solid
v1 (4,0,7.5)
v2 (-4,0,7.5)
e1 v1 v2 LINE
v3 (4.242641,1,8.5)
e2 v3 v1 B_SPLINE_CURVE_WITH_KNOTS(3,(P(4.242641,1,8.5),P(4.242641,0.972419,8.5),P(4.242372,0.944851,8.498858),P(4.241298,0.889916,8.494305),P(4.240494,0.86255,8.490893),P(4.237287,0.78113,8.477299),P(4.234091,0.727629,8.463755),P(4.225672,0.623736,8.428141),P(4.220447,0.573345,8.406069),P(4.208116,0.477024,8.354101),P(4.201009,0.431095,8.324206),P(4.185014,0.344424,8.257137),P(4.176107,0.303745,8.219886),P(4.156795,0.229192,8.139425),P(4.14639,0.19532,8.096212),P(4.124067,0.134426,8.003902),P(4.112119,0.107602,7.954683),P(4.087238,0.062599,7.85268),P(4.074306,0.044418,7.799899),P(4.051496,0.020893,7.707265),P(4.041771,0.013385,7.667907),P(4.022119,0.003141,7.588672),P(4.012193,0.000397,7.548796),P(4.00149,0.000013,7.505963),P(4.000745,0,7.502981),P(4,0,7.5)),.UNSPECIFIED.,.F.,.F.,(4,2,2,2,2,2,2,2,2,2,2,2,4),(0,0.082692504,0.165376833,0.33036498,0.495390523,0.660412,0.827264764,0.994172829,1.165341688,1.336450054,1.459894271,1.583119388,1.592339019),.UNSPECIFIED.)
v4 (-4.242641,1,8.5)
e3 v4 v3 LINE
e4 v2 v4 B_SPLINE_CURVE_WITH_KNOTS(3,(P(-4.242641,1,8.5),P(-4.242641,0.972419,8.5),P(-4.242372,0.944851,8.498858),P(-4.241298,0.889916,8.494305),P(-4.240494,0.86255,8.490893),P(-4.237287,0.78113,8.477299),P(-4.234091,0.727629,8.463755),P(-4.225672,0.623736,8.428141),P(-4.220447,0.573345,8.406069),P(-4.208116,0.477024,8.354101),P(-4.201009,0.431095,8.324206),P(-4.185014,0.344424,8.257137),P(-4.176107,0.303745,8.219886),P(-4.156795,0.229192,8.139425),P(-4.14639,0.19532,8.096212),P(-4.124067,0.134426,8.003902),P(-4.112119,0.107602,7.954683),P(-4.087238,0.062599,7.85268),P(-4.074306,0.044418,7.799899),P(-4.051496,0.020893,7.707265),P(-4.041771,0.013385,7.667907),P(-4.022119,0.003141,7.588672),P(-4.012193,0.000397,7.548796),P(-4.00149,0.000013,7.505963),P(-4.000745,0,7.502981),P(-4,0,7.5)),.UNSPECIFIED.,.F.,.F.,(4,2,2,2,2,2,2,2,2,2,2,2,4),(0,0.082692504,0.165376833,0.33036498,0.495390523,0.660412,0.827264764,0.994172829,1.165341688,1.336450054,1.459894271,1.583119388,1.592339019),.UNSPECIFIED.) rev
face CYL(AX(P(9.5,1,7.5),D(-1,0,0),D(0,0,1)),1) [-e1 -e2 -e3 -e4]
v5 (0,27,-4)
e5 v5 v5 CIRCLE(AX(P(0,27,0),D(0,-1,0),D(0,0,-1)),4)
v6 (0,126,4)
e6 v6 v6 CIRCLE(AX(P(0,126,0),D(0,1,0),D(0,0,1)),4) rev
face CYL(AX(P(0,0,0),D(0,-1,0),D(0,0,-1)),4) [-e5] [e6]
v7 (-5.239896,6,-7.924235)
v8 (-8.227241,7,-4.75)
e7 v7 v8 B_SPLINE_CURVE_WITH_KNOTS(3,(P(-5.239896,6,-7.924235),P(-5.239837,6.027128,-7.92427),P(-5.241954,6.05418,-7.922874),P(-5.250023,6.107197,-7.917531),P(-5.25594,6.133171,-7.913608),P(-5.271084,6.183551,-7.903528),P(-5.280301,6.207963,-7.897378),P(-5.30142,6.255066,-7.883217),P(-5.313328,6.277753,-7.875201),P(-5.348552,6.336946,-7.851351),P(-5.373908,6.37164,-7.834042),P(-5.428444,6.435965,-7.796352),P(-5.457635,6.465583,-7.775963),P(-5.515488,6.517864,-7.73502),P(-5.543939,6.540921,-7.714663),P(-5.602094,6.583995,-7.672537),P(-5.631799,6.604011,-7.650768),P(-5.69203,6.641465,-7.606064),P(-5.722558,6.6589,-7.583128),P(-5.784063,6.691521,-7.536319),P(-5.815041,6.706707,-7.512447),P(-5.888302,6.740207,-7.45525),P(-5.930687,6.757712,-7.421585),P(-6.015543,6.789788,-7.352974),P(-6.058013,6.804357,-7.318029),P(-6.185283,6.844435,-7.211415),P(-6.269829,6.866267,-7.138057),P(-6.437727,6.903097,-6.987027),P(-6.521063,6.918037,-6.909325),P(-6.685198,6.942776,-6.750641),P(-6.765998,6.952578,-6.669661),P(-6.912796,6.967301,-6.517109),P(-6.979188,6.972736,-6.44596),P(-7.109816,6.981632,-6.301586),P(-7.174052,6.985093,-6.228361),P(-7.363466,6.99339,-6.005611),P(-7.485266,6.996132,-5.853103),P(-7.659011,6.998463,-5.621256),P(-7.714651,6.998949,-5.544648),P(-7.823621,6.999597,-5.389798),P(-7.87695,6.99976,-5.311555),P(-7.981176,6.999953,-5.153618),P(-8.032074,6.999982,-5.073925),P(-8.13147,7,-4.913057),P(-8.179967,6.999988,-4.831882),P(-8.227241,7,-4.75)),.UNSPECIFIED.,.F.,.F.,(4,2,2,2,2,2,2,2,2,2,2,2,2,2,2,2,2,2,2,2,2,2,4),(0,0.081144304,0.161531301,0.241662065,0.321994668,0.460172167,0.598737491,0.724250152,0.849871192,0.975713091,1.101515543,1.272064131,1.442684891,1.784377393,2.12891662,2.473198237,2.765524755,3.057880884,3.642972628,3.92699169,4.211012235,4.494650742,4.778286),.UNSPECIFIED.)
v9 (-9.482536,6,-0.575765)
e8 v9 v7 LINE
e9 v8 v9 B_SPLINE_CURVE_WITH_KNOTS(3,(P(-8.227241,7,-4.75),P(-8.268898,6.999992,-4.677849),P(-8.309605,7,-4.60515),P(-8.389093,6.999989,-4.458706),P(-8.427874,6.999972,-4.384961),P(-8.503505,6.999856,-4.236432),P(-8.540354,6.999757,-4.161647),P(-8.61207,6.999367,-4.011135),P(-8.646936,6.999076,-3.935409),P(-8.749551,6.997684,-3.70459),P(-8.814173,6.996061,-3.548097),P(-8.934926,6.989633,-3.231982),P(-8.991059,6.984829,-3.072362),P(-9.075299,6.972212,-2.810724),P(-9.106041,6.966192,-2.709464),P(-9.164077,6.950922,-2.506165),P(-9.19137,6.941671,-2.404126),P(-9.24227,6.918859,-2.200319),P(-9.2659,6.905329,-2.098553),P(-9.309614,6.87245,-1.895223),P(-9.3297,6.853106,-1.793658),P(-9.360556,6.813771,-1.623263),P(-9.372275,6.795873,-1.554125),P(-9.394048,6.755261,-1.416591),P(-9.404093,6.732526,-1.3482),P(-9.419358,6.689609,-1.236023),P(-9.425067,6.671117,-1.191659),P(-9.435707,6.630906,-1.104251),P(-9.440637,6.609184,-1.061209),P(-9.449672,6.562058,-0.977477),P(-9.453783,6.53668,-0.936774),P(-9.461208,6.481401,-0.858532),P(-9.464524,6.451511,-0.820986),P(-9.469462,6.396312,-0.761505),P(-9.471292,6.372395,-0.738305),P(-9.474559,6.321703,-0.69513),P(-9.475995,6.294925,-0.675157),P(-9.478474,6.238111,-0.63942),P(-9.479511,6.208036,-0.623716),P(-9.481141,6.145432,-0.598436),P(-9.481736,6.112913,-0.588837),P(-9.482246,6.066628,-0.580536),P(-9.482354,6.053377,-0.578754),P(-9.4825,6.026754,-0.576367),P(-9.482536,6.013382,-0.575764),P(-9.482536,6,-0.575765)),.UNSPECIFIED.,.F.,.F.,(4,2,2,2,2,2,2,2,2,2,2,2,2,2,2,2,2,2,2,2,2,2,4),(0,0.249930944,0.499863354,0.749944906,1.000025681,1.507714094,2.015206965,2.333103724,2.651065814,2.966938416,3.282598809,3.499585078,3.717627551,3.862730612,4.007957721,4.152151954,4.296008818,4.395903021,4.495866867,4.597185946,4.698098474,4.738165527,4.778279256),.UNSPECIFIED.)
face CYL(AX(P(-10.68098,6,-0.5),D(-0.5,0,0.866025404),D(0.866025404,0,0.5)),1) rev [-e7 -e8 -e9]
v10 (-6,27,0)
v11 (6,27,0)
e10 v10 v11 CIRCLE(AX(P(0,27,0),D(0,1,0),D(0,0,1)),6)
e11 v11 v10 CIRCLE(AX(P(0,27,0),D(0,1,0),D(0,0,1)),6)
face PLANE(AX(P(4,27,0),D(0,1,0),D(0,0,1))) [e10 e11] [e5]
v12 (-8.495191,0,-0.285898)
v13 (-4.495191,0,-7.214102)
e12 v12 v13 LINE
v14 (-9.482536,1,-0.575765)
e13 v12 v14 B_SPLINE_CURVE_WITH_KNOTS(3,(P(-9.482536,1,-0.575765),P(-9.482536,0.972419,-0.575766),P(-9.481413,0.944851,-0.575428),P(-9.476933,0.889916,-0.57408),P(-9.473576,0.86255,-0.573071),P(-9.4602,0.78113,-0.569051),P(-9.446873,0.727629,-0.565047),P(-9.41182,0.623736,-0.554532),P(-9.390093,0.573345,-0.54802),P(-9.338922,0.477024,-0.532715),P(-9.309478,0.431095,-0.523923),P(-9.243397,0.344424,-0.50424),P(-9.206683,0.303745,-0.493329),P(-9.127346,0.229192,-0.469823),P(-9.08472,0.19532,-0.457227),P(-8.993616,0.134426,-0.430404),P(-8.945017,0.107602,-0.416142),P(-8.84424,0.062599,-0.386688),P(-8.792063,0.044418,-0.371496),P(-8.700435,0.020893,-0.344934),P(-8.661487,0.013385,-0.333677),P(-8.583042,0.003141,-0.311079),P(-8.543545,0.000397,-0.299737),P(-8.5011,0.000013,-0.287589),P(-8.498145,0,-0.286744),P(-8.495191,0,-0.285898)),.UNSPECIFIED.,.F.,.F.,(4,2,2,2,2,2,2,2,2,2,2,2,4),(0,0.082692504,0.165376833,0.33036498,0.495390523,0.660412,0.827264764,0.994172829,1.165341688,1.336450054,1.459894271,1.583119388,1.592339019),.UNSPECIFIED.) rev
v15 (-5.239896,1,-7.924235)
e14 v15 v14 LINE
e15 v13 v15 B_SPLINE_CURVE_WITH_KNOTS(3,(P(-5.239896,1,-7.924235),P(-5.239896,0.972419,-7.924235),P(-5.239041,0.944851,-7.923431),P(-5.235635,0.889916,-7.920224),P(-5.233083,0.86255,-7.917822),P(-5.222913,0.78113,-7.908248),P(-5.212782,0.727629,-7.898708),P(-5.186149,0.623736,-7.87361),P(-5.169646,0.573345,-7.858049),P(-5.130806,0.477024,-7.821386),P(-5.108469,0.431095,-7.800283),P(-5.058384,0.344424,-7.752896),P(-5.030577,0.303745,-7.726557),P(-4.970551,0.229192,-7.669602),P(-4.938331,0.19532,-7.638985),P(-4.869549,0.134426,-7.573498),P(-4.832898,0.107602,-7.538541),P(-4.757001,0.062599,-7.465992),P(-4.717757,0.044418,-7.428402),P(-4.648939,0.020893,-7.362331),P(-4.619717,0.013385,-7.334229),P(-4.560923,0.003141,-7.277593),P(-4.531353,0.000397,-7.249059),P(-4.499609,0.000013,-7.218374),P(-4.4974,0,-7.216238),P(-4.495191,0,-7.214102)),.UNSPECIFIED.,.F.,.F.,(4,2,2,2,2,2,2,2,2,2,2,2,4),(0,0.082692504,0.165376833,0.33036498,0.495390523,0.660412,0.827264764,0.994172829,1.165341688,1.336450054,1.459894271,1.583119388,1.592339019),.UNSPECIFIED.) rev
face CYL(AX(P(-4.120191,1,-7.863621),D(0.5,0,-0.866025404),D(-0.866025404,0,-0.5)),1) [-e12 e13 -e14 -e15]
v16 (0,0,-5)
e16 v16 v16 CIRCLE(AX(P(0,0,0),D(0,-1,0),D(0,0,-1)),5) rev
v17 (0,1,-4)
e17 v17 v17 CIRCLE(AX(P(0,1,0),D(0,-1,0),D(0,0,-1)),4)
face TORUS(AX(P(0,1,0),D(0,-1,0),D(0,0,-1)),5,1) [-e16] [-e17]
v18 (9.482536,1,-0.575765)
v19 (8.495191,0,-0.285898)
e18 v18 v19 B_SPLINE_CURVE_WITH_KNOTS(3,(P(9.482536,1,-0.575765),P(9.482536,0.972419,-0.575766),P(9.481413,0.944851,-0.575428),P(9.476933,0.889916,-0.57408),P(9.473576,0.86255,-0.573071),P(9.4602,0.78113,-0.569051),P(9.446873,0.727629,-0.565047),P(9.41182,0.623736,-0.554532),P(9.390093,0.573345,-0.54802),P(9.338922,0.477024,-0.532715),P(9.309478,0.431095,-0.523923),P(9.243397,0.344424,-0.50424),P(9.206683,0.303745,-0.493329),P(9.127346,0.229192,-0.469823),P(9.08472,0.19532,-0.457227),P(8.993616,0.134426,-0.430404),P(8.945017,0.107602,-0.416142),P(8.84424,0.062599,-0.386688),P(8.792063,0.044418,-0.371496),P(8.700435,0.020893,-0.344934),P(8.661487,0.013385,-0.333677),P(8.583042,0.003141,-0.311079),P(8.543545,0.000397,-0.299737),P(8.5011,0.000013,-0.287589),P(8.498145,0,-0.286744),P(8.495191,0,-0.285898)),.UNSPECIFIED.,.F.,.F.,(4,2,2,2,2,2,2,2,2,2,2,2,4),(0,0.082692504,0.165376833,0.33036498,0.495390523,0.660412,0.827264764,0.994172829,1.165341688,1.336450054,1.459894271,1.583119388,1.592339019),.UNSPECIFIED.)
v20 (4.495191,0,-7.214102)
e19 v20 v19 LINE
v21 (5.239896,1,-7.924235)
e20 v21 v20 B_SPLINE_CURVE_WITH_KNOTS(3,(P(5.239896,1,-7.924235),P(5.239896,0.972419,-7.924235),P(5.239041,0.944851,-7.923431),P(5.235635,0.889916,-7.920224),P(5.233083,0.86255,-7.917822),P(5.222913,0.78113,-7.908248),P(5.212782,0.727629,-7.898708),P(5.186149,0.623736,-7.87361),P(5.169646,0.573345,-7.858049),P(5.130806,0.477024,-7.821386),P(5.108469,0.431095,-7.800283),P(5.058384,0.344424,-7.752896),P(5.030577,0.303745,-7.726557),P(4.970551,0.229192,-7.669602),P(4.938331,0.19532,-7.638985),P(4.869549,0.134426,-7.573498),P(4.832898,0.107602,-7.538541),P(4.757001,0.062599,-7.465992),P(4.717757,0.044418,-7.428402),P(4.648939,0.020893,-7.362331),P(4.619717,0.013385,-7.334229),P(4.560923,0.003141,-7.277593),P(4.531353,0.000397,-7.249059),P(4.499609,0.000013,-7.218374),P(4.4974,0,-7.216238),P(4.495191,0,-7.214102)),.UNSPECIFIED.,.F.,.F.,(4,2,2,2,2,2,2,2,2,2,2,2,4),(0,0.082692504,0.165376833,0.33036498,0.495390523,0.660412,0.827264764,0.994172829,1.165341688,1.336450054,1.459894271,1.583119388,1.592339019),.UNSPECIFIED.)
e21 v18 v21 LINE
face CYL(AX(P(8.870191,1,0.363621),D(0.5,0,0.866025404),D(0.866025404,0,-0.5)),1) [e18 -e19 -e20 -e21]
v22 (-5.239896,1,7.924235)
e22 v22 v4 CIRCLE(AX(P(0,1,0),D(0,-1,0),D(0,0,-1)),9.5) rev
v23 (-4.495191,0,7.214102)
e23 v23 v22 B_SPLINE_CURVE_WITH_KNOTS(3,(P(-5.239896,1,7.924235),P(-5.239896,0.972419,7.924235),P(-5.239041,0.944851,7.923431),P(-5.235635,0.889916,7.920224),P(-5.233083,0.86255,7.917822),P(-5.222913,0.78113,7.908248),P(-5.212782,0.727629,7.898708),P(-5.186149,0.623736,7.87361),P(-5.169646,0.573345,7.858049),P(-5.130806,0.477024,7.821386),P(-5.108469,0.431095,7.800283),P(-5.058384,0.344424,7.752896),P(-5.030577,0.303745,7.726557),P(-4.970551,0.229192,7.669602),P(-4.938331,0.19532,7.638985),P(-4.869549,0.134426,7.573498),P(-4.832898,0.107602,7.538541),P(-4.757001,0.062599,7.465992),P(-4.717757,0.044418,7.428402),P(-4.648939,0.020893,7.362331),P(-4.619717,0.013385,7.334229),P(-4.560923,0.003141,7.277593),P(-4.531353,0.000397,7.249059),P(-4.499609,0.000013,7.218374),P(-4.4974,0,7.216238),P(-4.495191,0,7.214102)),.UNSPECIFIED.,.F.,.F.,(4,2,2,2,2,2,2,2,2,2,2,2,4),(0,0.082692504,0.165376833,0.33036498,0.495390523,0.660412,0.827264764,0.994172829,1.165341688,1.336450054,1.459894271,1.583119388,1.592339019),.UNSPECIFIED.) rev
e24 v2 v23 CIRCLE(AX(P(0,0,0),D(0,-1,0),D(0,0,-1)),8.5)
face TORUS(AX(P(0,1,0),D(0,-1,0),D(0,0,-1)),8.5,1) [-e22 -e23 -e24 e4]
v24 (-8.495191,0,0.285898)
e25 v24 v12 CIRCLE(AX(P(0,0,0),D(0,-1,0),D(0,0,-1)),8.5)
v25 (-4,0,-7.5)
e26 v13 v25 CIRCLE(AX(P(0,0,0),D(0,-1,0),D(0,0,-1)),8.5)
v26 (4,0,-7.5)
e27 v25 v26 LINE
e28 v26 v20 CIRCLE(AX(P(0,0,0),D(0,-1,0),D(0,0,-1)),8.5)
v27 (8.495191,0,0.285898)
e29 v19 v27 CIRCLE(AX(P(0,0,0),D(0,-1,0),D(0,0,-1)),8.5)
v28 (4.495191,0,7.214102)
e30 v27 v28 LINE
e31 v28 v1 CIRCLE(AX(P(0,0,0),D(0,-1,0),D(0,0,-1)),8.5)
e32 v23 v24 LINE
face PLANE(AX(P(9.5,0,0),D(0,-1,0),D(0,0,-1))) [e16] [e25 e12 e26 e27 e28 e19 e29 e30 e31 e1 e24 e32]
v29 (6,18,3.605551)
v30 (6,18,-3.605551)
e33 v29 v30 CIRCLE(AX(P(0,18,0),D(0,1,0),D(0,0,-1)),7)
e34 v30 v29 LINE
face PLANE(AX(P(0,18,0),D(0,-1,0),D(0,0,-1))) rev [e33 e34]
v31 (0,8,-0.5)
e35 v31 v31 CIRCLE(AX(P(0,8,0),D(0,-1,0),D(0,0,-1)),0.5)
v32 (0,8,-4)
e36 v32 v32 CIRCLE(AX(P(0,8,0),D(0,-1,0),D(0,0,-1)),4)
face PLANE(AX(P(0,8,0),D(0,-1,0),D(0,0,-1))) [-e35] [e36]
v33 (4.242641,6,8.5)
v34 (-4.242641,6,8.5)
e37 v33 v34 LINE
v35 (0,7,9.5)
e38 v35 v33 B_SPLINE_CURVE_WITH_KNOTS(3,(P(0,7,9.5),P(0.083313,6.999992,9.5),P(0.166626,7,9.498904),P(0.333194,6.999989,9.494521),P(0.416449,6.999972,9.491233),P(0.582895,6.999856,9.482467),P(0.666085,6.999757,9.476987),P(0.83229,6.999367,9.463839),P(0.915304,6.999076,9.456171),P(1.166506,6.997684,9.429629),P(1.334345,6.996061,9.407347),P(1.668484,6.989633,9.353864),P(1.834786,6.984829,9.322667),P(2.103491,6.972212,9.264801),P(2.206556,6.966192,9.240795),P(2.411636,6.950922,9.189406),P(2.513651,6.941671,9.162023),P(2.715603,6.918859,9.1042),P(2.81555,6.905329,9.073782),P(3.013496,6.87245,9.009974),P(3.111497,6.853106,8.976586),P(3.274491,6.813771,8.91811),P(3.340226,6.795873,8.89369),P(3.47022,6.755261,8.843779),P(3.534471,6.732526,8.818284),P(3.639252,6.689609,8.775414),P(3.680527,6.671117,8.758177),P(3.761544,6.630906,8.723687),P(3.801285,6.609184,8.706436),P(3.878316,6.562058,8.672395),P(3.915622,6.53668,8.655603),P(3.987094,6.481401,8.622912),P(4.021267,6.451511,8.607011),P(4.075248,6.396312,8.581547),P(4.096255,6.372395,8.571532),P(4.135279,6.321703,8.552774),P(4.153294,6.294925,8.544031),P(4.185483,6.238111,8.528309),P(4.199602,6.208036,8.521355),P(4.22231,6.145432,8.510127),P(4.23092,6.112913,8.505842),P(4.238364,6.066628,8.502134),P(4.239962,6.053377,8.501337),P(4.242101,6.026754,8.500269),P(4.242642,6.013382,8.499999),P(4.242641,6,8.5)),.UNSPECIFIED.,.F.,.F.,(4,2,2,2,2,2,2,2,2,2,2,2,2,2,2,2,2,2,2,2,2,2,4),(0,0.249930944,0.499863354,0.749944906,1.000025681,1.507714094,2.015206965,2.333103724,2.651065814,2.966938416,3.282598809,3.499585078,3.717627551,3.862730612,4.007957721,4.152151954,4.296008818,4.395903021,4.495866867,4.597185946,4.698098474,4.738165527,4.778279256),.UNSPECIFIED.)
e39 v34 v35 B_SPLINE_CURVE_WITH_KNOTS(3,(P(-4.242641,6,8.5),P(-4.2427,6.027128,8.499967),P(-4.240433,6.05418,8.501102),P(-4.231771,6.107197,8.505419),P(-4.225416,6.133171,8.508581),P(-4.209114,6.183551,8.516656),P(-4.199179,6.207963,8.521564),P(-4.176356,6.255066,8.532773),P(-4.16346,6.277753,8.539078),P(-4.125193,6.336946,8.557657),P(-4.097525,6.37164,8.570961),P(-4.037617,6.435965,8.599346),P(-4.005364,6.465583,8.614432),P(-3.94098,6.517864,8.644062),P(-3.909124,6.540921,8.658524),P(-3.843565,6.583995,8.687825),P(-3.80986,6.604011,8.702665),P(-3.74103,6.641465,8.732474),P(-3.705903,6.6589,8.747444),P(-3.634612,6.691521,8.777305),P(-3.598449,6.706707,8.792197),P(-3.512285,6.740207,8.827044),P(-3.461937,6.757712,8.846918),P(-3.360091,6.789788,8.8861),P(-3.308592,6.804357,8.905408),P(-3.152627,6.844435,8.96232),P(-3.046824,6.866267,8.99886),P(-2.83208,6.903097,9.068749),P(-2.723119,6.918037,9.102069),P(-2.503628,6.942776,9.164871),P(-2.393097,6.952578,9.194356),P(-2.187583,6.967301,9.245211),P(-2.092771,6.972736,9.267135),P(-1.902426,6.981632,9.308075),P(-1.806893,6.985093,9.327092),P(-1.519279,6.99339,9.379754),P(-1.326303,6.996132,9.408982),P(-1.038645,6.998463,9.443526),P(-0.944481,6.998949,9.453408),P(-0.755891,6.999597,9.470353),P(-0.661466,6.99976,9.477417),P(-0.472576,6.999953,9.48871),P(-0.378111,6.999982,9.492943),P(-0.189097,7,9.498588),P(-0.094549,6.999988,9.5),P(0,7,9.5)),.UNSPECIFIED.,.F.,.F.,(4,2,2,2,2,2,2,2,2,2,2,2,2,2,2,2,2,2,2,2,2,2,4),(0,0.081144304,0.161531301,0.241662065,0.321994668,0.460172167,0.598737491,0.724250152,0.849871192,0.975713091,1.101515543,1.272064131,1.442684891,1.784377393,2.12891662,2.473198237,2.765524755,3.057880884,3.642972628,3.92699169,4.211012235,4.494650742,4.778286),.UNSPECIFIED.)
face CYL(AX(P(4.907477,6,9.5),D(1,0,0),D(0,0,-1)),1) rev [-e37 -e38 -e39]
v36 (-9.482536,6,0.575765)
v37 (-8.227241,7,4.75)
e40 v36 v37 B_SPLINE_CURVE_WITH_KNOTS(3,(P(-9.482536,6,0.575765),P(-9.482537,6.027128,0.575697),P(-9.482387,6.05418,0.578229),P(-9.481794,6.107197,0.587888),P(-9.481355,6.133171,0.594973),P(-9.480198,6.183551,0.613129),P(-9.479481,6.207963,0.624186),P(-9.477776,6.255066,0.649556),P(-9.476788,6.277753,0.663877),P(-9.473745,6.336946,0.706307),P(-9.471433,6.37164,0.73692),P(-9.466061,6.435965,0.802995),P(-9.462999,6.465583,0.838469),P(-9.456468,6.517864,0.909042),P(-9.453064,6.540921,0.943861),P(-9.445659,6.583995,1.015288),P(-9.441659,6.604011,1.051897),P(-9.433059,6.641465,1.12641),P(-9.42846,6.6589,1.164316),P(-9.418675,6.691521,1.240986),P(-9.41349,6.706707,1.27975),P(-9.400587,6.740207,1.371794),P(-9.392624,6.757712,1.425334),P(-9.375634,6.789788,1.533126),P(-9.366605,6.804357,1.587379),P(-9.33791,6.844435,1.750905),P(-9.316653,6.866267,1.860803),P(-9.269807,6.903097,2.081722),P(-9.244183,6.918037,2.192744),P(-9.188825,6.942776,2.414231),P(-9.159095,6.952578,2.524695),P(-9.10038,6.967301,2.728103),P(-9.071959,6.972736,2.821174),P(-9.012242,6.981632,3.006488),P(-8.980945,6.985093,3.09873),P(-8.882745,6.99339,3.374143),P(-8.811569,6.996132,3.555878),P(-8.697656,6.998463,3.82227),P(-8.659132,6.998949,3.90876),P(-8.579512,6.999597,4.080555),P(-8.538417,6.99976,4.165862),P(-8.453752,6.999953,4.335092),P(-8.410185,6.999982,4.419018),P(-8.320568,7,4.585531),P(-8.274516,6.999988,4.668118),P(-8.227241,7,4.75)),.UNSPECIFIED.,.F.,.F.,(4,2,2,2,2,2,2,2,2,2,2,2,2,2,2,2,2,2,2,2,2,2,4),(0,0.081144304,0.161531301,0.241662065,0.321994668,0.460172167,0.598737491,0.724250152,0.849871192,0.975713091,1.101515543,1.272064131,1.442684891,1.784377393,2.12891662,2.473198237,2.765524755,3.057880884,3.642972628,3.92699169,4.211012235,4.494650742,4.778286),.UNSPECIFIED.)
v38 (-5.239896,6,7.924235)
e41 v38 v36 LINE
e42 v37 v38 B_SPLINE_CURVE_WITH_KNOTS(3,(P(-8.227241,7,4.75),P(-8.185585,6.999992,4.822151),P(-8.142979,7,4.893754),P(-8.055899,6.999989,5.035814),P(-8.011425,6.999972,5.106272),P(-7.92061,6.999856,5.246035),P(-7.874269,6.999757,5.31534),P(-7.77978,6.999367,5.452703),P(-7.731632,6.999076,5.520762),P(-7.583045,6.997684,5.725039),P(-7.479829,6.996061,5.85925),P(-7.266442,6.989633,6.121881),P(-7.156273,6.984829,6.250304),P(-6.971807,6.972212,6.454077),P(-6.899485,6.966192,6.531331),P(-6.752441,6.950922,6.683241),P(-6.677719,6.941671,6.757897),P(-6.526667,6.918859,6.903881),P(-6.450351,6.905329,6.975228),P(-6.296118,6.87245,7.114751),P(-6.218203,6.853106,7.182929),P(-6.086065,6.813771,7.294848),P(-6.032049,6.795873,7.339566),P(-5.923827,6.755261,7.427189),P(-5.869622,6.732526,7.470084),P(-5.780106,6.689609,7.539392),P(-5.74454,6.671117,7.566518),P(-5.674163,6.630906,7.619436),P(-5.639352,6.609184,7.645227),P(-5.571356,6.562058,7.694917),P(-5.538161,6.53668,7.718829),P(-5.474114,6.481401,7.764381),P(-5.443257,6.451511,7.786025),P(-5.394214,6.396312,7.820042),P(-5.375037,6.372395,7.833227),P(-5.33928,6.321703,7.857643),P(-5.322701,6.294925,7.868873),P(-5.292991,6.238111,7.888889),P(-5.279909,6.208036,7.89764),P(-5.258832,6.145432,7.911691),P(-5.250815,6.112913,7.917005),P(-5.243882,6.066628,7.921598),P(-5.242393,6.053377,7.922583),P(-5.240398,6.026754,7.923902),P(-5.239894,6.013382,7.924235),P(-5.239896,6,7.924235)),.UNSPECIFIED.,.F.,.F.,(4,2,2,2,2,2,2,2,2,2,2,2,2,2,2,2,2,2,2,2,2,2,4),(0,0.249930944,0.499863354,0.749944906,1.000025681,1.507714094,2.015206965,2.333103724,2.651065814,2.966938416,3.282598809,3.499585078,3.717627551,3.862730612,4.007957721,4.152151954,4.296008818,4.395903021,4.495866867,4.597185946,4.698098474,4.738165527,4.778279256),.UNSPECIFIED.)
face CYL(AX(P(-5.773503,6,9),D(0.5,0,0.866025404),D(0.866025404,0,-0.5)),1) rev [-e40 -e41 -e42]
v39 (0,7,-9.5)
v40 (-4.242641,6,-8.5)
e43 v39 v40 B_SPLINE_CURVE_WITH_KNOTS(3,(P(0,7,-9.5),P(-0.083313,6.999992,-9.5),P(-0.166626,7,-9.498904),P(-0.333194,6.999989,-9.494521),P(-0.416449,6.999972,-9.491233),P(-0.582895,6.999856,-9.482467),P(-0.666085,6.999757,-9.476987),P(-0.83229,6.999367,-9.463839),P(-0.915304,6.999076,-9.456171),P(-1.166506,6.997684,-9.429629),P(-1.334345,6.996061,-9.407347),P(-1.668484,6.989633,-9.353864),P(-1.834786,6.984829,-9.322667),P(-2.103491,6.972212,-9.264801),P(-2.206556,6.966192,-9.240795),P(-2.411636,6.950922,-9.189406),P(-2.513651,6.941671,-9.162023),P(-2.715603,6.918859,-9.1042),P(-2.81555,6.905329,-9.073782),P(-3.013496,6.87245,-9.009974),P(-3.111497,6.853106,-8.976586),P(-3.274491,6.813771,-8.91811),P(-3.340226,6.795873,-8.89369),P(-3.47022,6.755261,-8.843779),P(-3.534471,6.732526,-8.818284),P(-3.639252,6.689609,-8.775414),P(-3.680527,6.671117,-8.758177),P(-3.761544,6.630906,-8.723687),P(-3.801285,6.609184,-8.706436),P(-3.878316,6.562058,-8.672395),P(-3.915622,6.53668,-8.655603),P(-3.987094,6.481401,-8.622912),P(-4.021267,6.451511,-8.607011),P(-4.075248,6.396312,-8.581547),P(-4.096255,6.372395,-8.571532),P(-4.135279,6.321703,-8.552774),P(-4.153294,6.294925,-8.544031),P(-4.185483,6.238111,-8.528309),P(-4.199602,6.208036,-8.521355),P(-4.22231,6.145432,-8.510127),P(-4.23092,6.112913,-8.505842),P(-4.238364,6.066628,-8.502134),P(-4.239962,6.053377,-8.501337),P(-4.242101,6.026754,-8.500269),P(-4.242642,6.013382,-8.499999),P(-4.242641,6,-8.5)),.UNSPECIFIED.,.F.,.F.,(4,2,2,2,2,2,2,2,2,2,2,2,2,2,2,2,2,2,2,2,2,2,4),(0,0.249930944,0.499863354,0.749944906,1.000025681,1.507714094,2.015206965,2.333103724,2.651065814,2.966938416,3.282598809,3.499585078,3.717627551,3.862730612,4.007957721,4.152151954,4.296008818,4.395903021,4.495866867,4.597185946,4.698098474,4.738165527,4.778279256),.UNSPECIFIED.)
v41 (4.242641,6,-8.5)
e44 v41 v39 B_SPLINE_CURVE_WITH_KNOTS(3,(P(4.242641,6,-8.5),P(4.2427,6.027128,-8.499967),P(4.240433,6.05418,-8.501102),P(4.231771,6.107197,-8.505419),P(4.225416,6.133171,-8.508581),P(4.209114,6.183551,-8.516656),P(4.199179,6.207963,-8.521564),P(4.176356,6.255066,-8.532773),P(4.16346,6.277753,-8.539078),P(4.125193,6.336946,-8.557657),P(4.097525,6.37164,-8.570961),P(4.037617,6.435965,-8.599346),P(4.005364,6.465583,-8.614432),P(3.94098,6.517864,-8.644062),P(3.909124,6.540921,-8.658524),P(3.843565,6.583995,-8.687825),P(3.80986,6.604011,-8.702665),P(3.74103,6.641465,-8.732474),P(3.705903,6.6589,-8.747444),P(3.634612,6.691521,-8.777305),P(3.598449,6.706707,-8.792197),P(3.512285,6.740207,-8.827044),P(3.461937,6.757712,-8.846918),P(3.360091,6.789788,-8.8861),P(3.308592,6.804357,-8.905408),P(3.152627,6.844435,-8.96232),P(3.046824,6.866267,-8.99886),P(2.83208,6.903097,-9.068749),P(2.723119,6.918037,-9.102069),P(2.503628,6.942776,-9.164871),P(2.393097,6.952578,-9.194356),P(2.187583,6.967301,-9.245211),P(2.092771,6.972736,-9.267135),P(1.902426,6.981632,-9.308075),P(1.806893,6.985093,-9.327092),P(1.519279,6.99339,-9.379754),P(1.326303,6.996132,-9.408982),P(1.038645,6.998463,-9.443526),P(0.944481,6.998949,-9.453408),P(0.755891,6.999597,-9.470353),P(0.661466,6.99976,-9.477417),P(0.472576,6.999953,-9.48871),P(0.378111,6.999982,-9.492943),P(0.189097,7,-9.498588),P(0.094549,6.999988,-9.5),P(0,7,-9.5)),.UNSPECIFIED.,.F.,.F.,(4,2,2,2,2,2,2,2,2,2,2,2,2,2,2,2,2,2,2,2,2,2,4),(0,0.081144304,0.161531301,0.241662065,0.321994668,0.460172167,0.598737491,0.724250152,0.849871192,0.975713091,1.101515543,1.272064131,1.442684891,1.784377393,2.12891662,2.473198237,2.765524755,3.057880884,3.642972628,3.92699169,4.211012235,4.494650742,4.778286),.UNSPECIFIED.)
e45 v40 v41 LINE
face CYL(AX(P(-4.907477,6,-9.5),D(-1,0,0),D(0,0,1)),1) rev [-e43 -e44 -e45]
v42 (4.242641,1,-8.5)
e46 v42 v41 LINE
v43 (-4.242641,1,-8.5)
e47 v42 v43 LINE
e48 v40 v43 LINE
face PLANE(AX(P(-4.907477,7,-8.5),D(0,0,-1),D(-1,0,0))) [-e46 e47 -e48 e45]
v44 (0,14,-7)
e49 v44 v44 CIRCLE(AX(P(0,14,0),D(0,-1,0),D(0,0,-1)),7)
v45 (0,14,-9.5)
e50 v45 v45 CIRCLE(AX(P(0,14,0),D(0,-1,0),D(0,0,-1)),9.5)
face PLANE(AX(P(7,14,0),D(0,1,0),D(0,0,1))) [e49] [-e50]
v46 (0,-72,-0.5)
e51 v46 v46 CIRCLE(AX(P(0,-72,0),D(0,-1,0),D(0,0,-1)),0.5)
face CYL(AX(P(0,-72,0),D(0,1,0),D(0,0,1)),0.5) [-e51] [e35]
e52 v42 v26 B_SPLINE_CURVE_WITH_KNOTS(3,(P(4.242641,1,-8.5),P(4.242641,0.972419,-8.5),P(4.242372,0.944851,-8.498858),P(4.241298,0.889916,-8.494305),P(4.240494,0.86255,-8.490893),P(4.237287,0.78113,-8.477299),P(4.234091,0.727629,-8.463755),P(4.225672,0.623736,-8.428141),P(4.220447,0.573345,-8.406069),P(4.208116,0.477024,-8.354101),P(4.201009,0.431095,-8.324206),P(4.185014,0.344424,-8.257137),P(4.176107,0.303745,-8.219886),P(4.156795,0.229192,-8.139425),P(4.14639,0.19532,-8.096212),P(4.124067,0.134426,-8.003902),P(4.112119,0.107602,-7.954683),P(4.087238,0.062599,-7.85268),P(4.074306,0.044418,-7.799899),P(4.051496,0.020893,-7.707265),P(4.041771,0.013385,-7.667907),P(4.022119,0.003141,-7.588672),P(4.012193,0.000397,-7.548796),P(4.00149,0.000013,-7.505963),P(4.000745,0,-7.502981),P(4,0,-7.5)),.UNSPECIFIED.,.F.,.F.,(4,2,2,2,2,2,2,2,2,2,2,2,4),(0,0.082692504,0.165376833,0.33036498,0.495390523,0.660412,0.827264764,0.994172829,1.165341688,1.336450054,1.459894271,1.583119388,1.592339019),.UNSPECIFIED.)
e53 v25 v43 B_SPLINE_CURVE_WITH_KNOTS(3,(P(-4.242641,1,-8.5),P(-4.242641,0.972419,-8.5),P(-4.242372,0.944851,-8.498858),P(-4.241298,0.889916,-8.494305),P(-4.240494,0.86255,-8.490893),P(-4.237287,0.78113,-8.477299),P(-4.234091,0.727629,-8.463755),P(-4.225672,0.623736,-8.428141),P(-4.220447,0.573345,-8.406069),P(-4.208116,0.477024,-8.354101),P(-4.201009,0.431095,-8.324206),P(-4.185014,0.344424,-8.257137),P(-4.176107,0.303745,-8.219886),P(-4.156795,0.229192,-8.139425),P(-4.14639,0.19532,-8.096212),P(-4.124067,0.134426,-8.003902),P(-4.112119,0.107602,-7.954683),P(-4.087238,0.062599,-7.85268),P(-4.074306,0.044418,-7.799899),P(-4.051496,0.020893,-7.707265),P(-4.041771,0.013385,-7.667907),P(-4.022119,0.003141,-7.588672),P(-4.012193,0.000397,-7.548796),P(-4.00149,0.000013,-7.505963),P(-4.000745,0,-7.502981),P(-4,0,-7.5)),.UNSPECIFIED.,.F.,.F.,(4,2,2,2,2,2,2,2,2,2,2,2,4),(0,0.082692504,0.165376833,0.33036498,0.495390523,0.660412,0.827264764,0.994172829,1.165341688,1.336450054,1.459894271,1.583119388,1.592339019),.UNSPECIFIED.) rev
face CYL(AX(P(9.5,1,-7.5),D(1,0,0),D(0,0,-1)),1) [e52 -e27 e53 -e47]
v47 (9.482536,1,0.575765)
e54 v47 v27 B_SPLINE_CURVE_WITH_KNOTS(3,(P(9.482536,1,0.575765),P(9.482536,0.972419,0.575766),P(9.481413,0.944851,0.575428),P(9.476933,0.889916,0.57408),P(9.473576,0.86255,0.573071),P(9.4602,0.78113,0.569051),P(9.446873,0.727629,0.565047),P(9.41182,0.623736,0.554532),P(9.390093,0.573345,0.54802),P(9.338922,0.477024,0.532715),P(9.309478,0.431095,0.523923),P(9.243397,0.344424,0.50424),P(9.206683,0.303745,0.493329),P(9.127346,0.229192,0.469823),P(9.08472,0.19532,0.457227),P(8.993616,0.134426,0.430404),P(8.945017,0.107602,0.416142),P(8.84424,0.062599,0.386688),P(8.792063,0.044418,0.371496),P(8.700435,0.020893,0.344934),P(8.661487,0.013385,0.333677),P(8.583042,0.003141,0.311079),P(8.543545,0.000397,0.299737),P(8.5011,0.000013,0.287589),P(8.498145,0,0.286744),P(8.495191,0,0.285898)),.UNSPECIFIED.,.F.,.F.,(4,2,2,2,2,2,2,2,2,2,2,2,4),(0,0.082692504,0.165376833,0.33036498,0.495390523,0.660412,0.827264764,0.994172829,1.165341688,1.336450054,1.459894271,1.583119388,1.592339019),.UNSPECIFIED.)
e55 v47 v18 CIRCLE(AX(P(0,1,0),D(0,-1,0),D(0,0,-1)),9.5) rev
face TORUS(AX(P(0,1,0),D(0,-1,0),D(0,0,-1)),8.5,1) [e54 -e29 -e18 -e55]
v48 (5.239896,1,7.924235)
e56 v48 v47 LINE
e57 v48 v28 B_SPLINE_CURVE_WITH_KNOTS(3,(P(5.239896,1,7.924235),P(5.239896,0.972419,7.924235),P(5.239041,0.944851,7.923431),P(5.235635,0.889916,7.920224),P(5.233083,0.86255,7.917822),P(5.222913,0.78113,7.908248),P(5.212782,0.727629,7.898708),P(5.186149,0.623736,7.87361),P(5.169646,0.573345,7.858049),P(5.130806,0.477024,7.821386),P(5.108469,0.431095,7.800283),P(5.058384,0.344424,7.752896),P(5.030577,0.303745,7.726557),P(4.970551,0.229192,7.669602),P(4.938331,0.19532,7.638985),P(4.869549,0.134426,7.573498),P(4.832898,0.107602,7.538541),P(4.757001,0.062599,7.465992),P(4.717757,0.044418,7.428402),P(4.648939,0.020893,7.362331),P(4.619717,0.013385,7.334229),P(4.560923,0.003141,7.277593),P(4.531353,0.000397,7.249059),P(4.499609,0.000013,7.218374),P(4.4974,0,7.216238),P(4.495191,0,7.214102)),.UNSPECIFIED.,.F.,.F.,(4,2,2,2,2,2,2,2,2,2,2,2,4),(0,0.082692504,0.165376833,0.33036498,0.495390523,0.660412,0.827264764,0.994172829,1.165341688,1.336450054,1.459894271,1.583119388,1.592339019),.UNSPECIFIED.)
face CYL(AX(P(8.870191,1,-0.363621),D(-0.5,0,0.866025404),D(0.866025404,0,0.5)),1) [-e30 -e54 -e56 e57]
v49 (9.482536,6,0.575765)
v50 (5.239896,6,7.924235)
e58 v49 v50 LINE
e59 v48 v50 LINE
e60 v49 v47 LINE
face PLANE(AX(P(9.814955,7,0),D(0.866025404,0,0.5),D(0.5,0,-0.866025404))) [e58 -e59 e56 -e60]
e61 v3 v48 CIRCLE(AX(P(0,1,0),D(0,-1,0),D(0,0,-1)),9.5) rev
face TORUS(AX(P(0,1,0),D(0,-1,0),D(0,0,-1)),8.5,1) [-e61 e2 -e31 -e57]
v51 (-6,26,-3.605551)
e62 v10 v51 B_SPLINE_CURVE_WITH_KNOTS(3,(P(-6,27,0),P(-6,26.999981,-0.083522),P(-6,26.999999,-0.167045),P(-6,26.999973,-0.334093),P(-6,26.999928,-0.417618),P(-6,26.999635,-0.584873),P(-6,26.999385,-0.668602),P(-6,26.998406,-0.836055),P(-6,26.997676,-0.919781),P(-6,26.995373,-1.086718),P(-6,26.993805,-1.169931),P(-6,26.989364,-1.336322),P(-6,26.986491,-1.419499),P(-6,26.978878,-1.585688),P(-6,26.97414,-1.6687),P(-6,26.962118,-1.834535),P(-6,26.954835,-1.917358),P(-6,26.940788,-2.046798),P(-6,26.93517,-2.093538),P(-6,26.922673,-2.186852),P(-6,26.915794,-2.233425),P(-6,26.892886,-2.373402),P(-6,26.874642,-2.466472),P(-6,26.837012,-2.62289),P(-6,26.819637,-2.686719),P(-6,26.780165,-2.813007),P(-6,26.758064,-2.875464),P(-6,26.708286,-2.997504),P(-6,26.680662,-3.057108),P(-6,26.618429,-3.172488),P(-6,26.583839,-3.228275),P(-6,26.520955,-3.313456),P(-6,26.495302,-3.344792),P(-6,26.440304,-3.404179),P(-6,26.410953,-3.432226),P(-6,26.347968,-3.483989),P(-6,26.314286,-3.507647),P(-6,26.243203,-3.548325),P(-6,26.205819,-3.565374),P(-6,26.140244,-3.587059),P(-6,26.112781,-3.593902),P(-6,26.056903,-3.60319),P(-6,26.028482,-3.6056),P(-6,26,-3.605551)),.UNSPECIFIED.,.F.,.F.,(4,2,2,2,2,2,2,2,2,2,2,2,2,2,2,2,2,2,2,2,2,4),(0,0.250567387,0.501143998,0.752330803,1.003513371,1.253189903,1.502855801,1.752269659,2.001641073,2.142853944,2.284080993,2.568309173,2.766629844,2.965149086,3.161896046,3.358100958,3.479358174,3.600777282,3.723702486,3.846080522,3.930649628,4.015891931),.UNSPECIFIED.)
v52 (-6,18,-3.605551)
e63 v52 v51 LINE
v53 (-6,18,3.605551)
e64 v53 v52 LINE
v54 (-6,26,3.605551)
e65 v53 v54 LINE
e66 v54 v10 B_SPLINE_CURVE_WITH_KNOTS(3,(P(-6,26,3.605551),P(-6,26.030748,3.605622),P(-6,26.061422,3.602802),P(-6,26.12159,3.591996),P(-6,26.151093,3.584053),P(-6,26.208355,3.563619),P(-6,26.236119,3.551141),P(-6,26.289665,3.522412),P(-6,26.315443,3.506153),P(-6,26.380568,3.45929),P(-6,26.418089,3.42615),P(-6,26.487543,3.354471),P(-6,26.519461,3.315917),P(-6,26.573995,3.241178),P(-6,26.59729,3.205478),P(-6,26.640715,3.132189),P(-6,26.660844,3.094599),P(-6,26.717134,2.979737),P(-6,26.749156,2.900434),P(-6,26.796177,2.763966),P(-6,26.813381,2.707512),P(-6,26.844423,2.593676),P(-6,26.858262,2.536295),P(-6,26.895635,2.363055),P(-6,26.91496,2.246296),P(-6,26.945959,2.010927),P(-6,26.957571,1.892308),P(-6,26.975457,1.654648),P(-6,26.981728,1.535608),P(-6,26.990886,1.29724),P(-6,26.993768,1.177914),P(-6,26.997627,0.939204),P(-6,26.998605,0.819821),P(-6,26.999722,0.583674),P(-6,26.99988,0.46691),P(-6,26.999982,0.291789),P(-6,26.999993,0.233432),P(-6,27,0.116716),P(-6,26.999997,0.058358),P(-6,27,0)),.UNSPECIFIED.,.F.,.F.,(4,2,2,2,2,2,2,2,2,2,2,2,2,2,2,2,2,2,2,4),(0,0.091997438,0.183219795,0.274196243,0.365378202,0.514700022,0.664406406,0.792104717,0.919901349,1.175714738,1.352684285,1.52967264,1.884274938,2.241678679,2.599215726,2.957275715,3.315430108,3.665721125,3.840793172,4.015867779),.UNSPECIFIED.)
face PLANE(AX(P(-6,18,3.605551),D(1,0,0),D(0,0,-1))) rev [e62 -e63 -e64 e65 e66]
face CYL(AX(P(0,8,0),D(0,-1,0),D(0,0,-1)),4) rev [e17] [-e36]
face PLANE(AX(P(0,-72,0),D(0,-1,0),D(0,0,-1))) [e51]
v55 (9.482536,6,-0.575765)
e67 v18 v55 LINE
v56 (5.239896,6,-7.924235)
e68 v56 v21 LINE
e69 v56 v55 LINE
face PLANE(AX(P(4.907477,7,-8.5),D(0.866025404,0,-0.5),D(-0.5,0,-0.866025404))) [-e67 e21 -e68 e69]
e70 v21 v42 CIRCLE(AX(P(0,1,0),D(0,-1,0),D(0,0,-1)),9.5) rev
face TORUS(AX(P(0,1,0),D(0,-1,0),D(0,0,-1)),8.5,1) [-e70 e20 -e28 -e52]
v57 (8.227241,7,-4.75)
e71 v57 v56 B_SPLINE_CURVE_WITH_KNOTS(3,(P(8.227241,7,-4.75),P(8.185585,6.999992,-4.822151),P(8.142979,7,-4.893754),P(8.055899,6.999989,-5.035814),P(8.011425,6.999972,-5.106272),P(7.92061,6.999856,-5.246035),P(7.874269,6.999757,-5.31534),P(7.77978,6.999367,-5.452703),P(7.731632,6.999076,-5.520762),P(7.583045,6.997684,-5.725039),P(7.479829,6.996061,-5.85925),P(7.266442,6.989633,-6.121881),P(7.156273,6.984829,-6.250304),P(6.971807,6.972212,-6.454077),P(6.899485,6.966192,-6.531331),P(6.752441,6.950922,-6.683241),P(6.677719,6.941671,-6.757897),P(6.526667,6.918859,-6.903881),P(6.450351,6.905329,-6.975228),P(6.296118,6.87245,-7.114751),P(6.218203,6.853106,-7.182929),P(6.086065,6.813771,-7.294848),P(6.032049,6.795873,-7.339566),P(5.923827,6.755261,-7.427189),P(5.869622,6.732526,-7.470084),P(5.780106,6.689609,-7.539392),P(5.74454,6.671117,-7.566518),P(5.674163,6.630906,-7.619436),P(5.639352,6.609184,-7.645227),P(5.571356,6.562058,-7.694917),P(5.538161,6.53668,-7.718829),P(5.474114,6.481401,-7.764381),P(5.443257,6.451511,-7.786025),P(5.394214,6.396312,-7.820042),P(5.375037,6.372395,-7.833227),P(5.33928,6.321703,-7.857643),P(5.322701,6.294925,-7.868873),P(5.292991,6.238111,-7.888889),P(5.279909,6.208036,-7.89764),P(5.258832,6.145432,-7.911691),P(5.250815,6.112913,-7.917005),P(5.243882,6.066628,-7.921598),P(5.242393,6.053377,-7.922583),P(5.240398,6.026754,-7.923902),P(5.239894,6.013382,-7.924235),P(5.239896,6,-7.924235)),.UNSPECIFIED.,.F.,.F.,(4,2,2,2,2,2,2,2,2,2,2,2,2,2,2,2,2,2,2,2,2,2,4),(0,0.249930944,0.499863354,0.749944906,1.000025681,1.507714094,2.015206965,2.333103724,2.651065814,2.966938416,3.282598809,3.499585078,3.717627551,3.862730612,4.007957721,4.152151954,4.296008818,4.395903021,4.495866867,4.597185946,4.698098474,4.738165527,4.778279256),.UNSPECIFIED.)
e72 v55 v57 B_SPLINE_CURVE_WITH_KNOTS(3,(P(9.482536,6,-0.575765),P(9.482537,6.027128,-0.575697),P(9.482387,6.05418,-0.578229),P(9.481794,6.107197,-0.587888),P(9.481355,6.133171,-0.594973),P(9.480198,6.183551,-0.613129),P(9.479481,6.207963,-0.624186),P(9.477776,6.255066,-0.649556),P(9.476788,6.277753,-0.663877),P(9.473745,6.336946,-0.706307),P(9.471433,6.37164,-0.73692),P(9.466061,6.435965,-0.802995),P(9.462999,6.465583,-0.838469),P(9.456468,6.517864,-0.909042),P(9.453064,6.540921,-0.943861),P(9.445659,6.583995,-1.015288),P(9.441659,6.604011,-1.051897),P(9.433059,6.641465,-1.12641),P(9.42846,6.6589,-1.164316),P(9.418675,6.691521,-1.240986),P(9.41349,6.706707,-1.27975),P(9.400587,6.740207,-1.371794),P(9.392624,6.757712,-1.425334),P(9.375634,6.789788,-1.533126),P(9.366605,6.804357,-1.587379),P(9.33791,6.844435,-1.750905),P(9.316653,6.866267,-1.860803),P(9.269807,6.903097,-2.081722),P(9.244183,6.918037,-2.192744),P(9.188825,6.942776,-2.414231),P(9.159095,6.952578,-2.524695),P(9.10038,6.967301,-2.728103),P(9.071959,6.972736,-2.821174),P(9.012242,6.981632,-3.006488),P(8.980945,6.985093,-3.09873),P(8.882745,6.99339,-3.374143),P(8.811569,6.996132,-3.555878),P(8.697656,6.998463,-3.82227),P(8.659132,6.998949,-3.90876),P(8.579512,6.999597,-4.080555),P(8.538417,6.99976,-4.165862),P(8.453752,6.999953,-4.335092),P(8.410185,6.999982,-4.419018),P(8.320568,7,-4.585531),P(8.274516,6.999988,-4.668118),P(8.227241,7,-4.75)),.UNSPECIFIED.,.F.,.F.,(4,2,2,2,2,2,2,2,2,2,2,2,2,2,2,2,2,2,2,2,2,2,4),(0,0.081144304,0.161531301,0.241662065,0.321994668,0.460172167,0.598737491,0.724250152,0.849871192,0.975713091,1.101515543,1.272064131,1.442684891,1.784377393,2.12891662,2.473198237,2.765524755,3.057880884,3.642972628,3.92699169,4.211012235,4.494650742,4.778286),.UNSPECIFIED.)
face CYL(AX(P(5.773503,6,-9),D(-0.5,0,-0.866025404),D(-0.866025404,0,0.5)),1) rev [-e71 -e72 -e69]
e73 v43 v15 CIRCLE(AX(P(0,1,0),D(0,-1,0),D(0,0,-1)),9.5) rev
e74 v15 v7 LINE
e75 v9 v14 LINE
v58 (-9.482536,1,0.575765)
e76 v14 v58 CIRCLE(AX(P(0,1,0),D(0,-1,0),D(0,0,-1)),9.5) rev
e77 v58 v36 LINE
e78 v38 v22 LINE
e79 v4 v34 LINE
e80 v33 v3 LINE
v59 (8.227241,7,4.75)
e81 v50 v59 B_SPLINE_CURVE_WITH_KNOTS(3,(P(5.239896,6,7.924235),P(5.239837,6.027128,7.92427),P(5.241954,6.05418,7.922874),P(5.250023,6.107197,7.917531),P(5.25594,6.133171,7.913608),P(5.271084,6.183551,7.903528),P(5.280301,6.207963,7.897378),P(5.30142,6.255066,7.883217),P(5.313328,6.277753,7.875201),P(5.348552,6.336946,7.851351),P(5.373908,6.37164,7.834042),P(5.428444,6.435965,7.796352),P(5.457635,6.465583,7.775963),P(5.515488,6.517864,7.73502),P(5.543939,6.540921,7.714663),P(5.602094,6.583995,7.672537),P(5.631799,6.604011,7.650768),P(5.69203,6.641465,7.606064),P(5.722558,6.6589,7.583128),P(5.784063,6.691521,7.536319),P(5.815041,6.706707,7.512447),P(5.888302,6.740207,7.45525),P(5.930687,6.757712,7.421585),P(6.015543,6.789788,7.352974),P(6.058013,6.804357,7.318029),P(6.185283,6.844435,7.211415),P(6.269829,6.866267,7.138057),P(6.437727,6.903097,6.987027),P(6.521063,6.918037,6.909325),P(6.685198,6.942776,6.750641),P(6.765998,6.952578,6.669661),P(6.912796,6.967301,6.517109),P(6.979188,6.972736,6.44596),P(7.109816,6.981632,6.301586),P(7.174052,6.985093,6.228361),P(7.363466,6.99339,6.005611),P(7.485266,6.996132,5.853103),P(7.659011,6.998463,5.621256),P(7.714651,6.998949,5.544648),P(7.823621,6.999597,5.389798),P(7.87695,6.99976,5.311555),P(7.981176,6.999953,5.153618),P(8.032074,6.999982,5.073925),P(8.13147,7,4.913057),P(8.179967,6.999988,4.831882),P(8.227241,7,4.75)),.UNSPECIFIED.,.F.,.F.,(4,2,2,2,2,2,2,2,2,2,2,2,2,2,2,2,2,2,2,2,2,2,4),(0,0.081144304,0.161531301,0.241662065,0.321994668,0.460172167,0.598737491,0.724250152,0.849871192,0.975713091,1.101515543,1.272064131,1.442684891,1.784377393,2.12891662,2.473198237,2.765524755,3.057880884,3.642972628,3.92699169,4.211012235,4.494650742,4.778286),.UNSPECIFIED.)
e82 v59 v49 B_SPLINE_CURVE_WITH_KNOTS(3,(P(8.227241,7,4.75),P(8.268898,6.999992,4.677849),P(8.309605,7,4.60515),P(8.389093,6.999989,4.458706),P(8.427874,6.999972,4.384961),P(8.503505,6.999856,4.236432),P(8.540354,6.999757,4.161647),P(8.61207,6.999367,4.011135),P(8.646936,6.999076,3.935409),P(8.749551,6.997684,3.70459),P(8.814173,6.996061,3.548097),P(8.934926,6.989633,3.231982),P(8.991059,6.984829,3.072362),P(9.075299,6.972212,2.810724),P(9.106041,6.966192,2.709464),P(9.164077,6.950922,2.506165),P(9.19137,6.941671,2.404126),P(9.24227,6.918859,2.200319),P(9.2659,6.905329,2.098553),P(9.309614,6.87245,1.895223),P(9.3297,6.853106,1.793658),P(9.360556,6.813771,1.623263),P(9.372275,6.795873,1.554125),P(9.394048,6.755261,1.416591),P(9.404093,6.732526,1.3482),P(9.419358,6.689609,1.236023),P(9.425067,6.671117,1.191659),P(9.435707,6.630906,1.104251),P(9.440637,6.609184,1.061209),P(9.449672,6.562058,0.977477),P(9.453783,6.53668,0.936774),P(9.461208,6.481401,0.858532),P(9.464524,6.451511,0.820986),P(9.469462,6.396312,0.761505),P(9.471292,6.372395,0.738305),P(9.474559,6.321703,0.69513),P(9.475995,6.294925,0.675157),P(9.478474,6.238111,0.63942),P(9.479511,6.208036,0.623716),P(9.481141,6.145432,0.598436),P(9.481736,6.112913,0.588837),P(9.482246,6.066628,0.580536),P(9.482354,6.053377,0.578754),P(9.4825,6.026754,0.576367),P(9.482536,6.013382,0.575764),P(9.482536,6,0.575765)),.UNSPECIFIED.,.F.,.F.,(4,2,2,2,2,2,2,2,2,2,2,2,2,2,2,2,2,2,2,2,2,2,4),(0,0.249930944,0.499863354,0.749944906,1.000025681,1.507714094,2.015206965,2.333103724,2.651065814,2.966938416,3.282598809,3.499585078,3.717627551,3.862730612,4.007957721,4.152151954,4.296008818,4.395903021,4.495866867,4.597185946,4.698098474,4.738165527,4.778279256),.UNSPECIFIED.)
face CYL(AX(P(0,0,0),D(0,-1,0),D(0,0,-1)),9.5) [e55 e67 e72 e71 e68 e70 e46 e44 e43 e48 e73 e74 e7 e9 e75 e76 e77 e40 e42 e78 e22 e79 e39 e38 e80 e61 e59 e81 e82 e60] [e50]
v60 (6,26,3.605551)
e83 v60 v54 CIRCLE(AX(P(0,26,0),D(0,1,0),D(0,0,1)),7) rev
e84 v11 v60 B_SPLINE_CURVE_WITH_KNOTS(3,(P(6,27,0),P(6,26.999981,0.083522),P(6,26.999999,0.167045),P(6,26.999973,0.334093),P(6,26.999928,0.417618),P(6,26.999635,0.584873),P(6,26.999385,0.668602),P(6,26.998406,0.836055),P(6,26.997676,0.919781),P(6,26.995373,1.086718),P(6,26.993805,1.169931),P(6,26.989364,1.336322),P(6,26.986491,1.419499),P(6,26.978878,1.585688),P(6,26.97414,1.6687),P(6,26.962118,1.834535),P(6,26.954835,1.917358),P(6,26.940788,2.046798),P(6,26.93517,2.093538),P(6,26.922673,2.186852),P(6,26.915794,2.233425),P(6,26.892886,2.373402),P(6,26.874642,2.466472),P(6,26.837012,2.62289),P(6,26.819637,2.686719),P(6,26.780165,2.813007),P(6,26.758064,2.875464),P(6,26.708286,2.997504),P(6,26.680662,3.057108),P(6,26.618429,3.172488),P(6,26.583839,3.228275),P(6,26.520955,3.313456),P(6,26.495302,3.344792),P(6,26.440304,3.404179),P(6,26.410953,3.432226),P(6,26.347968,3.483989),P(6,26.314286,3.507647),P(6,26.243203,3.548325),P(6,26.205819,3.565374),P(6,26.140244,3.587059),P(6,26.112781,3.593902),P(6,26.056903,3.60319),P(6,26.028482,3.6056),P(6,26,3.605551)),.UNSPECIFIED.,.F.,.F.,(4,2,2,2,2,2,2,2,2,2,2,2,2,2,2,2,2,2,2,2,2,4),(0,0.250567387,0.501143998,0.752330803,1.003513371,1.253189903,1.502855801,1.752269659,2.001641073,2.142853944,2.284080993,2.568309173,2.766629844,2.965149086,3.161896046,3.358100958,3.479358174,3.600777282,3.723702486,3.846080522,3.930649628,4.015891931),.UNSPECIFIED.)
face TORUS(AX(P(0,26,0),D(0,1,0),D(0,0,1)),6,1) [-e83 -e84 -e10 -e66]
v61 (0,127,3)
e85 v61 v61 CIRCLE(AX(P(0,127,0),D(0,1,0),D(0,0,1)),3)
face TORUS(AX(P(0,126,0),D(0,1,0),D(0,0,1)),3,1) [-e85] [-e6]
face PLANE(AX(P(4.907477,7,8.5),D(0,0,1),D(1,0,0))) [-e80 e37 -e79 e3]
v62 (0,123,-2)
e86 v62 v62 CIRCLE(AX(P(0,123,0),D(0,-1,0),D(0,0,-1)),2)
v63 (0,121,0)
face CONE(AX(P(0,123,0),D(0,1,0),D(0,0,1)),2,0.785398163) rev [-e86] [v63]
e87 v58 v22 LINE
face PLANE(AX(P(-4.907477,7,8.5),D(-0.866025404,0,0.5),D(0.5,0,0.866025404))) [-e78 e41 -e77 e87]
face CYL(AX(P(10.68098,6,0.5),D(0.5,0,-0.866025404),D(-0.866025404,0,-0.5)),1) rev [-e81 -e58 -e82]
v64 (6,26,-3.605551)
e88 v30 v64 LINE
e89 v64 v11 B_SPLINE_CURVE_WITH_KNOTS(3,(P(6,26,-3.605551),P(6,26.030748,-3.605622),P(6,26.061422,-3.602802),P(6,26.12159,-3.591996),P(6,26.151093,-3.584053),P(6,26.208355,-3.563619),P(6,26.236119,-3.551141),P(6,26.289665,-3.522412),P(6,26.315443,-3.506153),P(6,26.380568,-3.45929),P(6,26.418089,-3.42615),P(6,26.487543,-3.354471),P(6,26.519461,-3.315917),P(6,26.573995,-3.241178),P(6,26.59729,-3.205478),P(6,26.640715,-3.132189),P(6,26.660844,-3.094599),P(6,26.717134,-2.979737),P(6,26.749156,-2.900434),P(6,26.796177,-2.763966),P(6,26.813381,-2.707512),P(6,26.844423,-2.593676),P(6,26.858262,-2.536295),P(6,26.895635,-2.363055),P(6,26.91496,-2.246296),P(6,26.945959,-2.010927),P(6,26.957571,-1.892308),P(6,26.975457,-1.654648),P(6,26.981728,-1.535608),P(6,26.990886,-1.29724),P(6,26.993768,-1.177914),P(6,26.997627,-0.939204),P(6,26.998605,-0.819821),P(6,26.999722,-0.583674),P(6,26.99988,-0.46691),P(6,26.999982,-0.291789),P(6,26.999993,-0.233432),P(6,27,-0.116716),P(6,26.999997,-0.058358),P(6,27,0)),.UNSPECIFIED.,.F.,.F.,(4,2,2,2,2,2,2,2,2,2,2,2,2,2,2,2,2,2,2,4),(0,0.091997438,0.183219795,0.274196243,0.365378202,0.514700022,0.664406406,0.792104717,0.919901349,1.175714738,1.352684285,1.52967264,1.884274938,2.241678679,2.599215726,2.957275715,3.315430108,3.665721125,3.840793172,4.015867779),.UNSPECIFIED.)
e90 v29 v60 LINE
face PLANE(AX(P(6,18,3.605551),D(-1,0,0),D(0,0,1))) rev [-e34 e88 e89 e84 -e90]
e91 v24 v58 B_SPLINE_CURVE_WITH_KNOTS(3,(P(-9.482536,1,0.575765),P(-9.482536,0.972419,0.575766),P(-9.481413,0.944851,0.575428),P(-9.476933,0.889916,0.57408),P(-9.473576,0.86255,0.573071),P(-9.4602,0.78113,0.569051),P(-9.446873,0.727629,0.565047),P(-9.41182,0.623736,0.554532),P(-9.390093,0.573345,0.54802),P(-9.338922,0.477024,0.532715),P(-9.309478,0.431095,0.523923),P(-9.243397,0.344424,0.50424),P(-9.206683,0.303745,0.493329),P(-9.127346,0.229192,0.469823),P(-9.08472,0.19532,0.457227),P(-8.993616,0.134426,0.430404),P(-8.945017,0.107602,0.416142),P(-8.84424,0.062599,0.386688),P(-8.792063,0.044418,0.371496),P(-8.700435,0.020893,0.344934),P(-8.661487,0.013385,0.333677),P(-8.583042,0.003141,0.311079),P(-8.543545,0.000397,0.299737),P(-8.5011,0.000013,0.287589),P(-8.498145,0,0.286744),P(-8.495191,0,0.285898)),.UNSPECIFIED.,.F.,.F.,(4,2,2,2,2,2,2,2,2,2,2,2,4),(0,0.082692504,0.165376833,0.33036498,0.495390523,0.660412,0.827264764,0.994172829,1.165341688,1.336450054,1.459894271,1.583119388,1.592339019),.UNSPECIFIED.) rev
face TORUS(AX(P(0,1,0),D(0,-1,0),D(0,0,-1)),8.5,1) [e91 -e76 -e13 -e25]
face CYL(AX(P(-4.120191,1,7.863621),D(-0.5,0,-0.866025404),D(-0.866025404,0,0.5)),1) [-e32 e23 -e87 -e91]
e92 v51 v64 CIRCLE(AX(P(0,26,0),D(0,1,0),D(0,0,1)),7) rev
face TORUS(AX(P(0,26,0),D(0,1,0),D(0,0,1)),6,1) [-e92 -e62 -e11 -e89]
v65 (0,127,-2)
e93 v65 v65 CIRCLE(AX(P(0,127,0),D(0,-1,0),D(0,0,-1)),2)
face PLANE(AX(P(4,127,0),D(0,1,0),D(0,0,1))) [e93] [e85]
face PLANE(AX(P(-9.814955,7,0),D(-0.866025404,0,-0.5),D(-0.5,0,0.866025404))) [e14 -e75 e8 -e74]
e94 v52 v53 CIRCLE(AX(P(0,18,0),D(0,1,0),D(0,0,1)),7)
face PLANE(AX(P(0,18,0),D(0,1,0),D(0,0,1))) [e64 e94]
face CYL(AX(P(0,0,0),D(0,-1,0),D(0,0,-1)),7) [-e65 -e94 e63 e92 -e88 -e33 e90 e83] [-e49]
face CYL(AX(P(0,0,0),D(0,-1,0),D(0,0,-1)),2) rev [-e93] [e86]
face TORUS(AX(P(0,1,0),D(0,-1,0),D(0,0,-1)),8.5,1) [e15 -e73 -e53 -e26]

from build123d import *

# Parameters (mm, degrees)
ESQUISSE2_R             = 4
ENL_V_MAT_EXTRU_1_DEPTH = 8
ENL_V_START             = -9
ENL_V_MAT_EXTRU_2_DEPTH = 9
ESQUISSE4_R             = 15
ENL_V_MAT_EXTRU_3_DEPTH = 7
CONG_1_R                = 1
ESQUISSE5_R             = 0.5
BOSS_EXTRU_1_DEPTH      = 80


with BuildPart() as part:
    # Esquisse1 → Révolution1 (revolve)
    with BuildSketch(Plane.XY, mode=Mode.PRIVATE) as r_volution1_sk:
        Polygon((4, 127), (4, 27), (7, 27), (7, 14), (9.5, 14), (9.5, 0), (0, 0), (0, 121), (2, 123), (2, 127), align=None)
    revolve(r_volution1_sk.sketch.rotate(Axis((0, 0, 0), (0, 1, 0)), 90), axis=Axis((0, 0, 0), (0, 1, 0)))

    # Esquisse2 → Enlèv. mat.-Extru.1 (cut)
    with BuildSketch(Plane.XZ):
        with Locations(Location((0, 0, 0), (0, 0, 270))):
            Circle(ESQUISSE2_R)
    extrude(amount=-ENL_V_MAT_EXTRU_1_DEPTH, mode=Mode.SUBTRACT)

    # Esquisse3 → Enlèv. mat.-Extru.2 (cut)
    with BuildSketch(Plane(origin=(0, 27, 0), x_dir=(1, 0, 0), z_dir=(0, 1, 0)).offset(ENL_V_START)):
        with BuildLine():
            Line((6, -3.605551275), (6, 3.605551275))
            ThreePointArc((6, 3.605551275), (7, 0), (6, -3.605551275))
        make_face()
        with BuildLine():
            Line((-6, -3.605551275), (-6, 3.605551275))
            ThreePointArc((-6, 3.605551275), (-7, 0), (-6, -3.605551275))
        make_face()
    extrude(amount=ENL_V_MAT_EXTRU_2_DEPTH, mode=Mode.SUBTRACT)

    # Esquisse4 → Enlèv. mat.-Extru.3 (cut)
    with BuildSketch(Plane.XZ):
        Circle(ESQUISSE4_R)
        Polygon((9.814954576, 0), (4.907477288, 8.5), (-4.907477288, 8.5), (-9.814954576, 0), (-4.907477288, -8.5), (4.907477288, -8.5), align=None, mode=Mode.SUBTRACT)
    extrude(amount=-ENL_V_MAT_EXTRU_3_DEPTH, mode=Mode.SUBTRACT)

    # Congé1
    cong_1_edges = [part.edges().sort_by_distance(p)[0] for p in [
        (0, 127, 4),
        (-3.446820352, 27, -6.092571663),
        (0, 27, 7),
        (0, 0, -8.5),
        (-4.75, 0, -8.227241336),
        (-7.361215932, 0, -4.25),
        (-9.5, 0, 0),
        (-7.361215932, 0, 4.25),
        (-4.75, 0, 8.227241336),
        (0, 0, 8.5),
        (4.75, 0, 8.227241336),
        (7.361215932, 0, 4.25),
        (9.5, 0, 0),
        (7.361215932, 0, -4.25),
        (4.75, 0, -8.227241336),
        (0, 0, 4),
        (0, 7, 8.5),
        (7.361215932, 7, 4.25),
        (7.361215932, 7, -4.25),
        (0, 7, -8.5),
        (-7.361215932, 7, -4.25),
        (-7.361215932, 7, 4.25),
    ]]
    fillet(cong_1_edges, radius=CONG_1_R - 0.0001)  # a hair under: the kernel refuses the full size

    # Esquisse5 → Boss.-Extru.1 (add)
    with BuildSketch(Plane.XZ.offset(-8)):
        with Locations(Location((0, 0, 0), (0, 0, 270))):
            Circle(ESQUISSE5_R)
    extrude(amount=BOSS_EXTRU_1_DEPTH)


solid = part.part
